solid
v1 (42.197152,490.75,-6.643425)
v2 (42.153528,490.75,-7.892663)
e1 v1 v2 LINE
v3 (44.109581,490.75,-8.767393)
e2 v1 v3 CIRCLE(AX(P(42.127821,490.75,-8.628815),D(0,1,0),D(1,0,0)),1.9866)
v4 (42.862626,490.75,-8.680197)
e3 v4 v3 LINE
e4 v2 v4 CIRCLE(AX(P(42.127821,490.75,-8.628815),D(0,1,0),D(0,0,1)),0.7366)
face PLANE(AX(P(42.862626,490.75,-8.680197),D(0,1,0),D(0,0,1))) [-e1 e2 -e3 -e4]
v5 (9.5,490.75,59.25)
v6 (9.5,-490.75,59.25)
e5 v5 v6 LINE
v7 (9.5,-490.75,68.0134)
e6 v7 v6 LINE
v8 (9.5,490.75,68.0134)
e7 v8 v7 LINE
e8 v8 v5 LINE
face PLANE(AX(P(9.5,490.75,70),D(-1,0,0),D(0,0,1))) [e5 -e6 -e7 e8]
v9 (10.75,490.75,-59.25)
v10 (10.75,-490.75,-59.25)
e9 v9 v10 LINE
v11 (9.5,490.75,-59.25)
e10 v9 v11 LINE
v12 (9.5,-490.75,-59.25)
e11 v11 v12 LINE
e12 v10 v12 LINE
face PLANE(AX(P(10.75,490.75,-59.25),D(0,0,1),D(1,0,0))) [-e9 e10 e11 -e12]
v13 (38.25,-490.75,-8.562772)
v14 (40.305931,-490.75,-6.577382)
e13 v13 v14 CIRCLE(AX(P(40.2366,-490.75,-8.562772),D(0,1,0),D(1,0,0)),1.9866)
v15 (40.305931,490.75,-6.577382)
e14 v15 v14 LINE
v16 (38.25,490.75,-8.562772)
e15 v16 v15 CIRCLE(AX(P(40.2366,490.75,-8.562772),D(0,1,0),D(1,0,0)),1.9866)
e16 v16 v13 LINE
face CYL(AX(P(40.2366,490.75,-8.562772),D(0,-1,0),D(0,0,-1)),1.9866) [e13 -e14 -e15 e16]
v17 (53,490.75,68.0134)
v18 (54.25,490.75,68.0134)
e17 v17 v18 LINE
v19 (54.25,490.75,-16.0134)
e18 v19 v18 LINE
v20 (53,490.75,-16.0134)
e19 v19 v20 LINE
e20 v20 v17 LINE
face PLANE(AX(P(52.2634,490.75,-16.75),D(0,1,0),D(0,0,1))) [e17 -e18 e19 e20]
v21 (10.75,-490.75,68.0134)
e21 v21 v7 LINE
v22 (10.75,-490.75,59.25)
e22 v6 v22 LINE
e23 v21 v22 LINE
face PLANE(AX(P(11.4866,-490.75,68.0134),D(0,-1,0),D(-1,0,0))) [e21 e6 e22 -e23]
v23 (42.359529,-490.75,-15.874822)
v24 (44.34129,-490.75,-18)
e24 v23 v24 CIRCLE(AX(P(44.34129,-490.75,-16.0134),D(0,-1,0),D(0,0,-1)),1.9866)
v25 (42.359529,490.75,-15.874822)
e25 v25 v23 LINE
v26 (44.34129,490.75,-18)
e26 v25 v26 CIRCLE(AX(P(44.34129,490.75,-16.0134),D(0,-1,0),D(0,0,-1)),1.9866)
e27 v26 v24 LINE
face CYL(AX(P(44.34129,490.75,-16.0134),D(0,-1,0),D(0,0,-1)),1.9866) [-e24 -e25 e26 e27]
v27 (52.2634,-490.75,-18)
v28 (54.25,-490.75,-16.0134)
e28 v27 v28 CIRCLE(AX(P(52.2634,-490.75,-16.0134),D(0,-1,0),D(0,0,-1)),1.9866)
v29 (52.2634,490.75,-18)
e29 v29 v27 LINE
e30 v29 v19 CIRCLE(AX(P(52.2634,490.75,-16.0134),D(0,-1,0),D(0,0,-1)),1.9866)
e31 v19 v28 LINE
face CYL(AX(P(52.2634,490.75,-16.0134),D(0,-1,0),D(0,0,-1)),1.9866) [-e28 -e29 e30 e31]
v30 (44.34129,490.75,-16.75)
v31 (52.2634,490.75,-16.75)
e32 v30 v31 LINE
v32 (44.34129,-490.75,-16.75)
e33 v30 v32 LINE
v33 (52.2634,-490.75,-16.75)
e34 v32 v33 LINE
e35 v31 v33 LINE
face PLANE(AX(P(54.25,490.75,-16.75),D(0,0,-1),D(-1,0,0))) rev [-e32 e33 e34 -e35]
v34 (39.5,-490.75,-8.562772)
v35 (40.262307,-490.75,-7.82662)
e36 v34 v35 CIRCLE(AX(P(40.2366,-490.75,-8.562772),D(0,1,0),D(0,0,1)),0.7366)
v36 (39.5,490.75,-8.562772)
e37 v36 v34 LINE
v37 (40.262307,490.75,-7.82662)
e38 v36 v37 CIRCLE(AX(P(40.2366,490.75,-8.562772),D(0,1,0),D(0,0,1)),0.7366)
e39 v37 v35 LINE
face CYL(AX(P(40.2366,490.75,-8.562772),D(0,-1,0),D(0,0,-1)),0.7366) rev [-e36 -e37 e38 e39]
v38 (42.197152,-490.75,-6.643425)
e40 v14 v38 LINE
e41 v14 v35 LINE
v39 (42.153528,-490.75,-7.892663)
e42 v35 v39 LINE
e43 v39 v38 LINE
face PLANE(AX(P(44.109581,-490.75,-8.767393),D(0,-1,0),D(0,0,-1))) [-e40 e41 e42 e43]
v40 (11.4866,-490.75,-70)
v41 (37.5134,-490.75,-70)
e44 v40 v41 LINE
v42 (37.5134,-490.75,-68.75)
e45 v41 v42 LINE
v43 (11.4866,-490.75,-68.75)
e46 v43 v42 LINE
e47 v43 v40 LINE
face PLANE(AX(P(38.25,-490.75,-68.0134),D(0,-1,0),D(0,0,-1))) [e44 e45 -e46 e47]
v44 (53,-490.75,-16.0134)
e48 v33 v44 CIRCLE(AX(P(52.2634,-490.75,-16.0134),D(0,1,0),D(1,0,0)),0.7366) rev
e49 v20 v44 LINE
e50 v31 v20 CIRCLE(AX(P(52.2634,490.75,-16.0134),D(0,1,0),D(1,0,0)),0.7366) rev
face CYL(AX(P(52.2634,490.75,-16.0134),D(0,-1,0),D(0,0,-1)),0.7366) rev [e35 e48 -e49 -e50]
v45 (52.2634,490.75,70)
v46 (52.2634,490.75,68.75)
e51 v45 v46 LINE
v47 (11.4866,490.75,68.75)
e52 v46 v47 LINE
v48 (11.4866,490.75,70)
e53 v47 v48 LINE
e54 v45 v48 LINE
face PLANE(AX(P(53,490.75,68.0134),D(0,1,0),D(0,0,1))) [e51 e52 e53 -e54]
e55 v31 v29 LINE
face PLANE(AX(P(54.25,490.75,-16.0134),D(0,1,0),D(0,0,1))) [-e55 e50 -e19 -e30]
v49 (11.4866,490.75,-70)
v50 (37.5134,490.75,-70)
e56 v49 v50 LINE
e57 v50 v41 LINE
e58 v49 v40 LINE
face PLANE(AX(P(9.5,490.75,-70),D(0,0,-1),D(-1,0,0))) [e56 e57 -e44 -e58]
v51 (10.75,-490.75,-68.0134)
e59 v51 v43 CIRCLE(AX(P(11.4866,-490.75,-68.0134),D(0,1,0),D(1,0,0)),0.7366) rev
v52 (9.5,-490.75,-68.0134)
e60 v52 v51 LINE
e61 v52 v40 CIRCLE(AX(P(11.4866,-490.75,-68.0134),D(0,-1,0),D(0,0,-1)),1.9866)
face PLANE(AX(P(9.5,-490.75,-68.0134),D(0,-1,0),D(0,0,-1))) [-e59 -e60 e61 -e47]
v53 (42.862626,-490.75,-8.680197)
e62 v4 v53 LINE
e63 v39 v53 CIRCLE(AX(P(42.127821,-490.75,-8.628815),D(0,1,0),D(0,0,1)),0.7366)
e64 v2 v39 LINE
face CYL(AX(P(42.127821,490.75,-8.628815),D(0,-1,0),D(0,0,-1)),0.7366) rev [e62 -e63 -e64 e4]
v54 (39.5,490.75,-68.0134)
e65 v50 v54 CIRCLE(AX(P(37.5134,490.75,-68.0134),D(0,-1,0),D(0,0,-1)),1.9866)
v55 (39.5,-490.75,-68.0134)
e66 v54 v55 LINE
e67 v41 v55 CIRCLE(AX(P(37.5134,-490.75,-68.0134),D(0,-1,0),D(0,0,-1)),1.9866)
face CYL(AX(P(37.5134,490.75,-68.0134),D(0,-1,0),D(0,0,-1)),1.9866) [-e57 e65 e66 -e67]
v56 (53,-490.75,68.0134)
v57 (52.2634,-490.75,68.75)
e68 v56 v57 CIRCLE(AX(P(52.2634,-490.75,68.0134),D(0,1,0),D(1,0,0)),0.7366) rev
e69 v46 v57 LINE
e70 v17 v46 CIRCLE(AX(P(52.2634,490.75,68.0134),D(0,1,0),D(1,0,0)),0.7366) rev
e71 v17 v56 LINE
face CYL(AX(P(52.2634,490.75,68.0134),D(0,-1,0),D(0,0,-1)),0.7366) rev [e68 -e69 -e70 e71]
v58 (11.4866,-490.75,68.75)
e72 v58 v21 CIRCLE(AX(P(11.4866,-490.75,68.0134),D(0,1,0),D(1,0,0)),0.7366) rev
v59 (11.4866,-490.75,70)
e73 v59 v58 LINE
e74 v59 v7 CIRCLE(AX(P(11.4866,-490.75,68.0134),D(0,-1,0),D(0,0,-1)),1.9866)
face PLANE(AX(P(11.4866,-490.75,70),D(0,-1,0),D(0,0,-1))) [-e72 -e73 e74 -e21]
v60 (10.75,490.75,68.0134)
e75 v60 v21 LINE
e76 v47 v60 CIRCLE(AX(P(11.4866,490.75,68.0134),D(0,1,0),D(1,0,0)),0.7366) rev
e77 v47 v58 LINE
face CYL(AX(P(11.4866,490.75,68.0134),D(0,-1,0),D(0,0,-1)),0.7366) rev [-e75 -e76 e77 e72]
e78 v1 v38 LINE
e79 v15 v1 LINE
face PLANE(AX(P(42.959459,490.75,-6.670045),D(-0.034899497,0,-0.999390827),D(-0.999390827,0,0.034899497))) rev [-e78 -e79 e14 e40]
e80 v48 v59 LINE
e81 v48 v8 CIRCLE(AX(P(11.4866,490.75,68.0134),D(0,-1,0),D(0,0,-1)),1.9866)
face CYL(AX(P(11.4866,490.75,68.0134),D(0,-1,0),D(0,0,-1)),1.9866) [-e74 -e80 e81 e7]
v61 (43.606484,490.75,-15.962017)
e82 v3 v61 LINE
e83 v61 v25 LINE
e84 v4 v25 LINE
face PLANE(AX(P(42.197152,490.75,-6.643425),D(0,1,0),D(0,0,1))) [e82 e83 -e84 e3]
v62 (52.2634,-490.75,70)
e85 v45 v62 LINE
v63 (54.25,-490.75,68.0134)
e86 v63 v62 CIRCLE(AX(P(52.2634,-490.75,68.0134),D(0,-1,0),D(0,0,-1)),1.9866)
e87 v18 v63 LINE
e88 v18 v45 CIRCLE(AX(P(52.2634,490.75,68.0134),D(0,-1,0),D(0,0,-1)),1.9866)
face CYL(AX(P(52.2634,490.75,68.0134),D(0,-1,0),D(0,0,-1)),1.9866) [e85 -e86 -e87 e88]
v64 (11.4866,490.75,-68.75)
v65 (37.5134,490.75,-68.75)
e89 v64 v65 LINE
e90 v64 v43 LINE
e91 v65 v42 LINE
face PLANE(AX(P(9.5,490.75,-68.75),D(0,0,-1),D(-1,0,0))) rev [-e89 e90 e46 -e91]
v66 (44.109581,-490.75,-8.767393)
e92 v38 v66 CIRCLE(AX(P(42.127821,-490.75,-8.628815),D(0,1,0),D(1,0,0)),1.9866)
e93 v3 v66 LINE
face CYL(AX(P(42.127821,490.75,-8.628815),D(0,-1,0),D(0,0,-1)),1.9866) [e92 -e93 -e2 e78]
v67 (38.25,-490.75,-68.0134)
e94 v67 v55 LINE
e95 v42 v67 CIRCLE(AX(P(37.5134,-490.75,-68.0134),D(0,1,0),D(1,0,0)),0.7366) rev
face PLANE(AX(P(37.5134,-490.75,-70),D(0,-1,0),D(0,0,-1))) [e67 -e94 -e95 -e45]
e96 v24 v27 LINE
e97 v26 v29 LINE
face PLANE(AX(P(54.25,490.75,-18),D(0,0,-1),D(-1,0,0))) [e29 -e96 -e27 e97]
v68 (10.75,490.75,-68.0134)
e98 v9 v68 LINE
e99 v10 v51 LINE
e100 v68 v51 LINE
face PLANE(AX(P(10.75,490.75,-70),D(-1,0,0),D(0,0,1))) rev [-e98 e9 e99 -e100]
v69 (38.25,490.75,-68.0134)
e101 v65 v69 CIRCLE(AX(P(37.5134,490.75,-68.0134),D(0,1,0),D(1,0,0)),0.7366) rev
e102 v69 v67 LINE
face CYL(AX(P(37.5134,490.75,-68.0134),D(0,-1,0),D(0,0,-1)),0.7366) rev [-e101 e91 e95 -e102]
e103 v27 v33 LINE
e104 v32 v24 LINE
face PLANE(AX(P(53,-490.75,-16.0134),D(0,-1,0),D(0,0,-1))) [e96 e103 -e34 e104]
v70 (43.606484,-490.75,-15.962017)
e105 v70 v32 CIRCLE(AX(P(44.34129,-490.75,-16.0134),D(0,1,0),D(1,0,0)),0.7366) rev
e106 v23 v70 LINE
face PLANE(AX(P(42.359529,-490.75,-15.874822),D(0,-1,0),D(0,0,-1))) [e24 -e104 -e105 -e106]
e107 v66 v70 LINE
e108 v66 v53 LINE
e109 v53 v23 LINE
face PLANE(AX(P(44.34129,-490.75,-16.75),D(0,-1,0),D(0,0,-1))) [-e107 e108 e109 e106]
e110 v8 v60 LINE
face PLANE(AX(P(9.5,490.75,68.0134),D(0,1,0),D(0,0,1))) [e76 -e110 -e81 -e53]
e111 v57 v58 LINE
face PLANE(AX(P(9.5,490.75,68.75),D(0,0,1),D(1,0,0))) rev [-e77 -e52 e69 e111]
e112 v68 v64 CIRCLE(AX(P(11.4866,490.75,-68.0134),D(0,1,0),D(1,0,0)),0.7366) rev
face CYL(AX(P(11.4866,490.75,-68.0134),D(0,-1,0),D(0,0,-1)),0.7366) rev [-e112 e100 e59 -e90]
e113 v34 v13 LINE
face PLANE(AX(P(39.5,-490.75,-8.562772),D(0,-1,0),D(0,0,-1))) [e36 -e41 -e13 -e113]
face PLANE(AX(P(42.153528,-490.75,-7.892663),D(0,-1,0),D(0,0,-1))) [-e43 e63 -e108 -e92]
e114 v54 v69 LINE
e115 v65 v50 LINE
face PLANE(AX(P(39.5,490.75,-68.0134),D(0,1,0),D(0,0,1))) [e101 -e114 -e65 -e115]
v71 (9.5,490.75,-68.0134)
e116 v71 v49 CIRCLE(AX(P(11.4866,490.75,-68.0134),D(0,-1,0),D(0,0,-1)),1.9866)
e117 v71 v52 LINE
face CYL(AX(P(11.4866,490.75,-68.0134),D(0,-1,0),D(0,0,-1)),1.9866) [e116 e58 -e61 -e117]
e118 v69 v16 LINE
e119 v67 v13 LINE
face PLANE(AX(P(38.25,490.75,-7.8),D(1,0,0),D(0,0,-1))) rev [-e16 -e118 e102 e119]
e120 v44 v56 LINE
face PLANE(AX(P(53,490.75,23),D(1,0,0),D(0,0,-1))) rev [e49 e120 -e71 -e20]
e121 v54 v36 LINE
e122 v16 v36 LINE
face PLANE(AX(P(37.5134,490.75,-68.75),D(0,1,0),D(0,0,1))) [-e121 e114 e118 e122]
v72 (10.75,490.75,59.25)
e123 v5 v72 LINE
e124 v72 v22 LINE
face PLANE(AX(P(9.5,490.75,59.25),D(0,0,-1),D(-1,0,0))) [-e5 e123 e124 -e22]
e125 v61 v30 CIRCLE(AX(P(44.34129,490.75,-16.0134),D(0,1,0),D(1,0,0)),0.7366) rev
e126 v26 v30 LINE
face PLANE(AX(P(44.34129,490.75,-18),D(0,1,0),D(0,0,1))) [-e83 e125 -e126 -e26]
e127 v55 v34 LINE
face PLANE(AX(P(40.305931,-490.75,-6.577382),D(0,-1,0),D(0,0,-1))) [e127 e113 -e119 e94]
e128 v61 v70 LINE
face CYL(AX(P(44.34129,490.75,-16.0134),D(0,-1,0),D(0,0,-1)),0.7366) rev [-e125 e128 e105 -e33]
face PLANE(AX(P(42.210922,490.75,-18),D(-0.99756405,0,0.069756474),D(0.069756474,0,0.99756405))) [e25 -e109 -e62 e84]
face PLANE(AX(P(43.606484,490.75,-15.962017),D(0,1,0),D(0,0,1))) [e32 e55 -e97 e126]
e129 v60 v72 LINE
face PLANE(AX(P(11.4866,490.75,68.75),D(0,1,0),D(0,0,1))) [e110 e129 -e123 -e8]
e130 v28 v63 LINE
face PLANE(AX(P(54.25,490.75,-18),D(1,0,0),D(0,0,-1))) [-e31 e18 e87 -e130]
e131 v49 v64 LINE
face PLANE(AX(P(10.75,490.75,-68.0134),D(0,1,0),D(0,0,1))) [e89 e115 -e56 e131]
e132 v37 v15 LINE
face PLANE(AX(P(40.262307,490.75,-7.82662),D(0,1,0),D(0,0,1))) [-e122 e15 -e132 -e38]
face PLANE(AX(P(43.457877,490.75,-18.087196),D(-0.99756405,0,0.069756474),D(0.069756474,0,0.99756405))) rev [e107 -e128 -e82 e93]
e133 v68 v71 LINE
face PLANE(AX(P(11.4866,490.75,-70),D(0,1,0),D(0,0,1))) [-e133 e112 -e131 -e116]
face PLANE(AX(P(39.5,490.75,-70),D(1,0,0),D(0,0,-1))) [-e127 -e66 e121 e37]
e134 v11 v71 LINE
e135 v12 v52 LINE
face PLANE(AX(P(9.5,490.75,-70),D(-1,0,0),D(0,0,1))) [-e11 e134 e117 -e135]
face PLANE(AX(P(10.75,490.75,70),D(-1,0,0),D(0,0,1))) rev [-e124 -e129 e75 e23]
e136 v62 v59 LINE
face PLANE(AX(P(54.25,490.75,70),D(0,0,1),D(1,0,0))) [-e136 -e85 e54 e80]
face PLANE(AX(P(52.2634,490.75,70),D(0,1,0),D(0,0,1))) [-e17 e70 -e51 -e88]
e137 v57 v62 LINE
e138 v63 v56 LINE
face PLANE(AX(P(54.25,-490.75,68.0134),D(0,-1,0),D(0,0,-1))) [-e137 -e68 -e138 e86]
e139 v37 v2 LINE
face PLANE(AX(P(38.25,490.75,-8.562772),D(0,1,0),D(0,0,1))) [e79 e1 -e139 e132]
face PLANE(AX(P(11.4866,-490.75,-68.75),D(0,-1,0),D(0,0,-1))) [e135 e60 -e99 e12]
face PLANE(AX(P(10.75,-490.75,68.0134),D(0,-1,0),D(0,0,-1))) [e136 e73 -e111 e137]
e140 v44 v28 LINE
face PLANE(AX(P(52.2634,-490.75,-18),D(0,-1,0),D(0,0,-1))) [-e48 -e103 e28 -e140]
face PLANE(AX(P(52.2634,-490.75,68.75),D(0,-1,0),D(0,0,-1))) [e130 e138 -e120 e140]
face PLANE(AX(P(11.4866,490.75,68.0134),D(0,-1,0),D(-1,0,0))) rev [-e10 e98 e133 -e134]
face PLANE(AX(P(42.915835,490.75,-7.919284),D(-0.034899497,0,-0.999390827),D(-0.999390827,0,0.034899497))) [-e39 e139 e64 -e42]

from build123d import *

# Parameters (mm, degrees)
BASE_FLANGE1_DEPTH = 490.75


# Sheet-metal steps are written as plain solids
with BuildPart() as part:
    # Sketch1 → Base-Flange1 (new, symmetric)
    with BuildSketch(Plane(origin=(0, 0, 0), x_dir=(1, 0, 0), z_dir=(0, 1, 0))):
        with BuildLine():
            Line((9.5, 59.25), (9.5, 68.0134))
            ThreePointArc((9.5, 68.0134), (10.081861668, 69.418138332), (11.4866, 70))
            Line((11.4866, 70), (37.5134, 70))
            ThreePointArc((37.5134, 70), (38.918138332, 69.418138332), (39.5, 68.0134))
            Line((39.5, 68.0134), (39.5, 23))
            Line((39.5, 23), (39.5, 8.562771629))
            ThreePointArc((39.5, 8.562771629), (39.724914644, 8.032905932), (40.262306969, 7.826620346))
            Line((40.262306969, 7.826620346), (42.153527557, 7.892663224))
            ThreePointArc((42.153527557, 7.892663224), (42.675221066, 8.135932903), (42.862626267, 8.680197126))
            Line((42.862626267, 8.680197126), (42.359529101, 15.874821789))
            ThreePointArc((42.359529101, 15.874821789), (42.88838258, 17.368257942), (44.341289843, 18))
            Line((44.341289843, 18), (52.2634, 18))
            ThreePointArc((52.2634, 18), (53.668138332, 17.418138332), (54.25, 16.0134))
            Line((54.25, 16.0134), (54.25, -23))
            Line((54.25, -23), (54.25, -68.0134))
            ThreePointArc((54.25, -68.0134), (53.668138332, -69.418138332), (52.2634, -70))
            Line((52.2634, -70), (39.5, -70))
            Line((39.5, -70), (11.4866, -70))
            ThreePointArc((11.4866, -70), (10.081861668, -69.418138332), (9.5, -68.0134))
            Line((9.5, -68.0134), (9.5, -59.25))
            Line((9.5, -59.25), (10.75, -59.25))
            Line((10.75, -59.25), (10.75, -68.0134))
            ThreePointArc((10.75, -68.0134), (10.965745145, -68.534254855), (11.4866, -68.75))
            Line((11.4866, -68.75), (39.5, -68.75))
            Line((39.5, -68.75), (52.2634, -68.75))
            ThreePointArc((52.2634, -68.75), (52.784254855, -68.534254855), (53, -68.0134))
            Line((53, -68.0134), (53, -23))
            Line((53, -23), (53, 16.0134))
            ThreePointArc((53, 16.0134), (52.784254855, 16.534254855), (52.2634, 16.75))
            Line((52.2634, 16.75), (44.341289843, 16.75))
            ThreePointArc((44.341289843, 16.75), (43.802574707, 16.515759992), (43.606484164, 15.962017381))
            Line((43.606484164, 15.962017381), (44.10958133, 8.767392718))
            ThreePointArc((44.10958133, 8.767392718), (43.604152098, 7.299519645), (42.197151928, 6.64342469))
            Line((42.197151928, 6.64342469), (40.30593134, 6.577381812))
            ThreePointArc((40.30593134, 6.577381812), (38.856591681, 7.133731182), (38.25, 8.562771629))
            Line((38.25, 8.562771629), (38.25, 23))
            Line((38.25, 23), (38.25, 68.0134))
            ThreePointArc((38.25, 68.0134), (38.034254855, 68.534254855), (37.5134, 68.75))
            Line((37.5134, 68.75), (11.4866, 68.75))
            ThreePointArc((11.4866, 68.75), (10.965745145, 68.534254855), (10.75, 68.0134))
            Line((10.75, 68.0134), (10.75, 59.25))
            Line((10.75, 59.25), (9.5, 59.25))
        make_face()
    extrude(amount=BASE_FLANGE1_DEPTH, both=True)


solid = part.part
